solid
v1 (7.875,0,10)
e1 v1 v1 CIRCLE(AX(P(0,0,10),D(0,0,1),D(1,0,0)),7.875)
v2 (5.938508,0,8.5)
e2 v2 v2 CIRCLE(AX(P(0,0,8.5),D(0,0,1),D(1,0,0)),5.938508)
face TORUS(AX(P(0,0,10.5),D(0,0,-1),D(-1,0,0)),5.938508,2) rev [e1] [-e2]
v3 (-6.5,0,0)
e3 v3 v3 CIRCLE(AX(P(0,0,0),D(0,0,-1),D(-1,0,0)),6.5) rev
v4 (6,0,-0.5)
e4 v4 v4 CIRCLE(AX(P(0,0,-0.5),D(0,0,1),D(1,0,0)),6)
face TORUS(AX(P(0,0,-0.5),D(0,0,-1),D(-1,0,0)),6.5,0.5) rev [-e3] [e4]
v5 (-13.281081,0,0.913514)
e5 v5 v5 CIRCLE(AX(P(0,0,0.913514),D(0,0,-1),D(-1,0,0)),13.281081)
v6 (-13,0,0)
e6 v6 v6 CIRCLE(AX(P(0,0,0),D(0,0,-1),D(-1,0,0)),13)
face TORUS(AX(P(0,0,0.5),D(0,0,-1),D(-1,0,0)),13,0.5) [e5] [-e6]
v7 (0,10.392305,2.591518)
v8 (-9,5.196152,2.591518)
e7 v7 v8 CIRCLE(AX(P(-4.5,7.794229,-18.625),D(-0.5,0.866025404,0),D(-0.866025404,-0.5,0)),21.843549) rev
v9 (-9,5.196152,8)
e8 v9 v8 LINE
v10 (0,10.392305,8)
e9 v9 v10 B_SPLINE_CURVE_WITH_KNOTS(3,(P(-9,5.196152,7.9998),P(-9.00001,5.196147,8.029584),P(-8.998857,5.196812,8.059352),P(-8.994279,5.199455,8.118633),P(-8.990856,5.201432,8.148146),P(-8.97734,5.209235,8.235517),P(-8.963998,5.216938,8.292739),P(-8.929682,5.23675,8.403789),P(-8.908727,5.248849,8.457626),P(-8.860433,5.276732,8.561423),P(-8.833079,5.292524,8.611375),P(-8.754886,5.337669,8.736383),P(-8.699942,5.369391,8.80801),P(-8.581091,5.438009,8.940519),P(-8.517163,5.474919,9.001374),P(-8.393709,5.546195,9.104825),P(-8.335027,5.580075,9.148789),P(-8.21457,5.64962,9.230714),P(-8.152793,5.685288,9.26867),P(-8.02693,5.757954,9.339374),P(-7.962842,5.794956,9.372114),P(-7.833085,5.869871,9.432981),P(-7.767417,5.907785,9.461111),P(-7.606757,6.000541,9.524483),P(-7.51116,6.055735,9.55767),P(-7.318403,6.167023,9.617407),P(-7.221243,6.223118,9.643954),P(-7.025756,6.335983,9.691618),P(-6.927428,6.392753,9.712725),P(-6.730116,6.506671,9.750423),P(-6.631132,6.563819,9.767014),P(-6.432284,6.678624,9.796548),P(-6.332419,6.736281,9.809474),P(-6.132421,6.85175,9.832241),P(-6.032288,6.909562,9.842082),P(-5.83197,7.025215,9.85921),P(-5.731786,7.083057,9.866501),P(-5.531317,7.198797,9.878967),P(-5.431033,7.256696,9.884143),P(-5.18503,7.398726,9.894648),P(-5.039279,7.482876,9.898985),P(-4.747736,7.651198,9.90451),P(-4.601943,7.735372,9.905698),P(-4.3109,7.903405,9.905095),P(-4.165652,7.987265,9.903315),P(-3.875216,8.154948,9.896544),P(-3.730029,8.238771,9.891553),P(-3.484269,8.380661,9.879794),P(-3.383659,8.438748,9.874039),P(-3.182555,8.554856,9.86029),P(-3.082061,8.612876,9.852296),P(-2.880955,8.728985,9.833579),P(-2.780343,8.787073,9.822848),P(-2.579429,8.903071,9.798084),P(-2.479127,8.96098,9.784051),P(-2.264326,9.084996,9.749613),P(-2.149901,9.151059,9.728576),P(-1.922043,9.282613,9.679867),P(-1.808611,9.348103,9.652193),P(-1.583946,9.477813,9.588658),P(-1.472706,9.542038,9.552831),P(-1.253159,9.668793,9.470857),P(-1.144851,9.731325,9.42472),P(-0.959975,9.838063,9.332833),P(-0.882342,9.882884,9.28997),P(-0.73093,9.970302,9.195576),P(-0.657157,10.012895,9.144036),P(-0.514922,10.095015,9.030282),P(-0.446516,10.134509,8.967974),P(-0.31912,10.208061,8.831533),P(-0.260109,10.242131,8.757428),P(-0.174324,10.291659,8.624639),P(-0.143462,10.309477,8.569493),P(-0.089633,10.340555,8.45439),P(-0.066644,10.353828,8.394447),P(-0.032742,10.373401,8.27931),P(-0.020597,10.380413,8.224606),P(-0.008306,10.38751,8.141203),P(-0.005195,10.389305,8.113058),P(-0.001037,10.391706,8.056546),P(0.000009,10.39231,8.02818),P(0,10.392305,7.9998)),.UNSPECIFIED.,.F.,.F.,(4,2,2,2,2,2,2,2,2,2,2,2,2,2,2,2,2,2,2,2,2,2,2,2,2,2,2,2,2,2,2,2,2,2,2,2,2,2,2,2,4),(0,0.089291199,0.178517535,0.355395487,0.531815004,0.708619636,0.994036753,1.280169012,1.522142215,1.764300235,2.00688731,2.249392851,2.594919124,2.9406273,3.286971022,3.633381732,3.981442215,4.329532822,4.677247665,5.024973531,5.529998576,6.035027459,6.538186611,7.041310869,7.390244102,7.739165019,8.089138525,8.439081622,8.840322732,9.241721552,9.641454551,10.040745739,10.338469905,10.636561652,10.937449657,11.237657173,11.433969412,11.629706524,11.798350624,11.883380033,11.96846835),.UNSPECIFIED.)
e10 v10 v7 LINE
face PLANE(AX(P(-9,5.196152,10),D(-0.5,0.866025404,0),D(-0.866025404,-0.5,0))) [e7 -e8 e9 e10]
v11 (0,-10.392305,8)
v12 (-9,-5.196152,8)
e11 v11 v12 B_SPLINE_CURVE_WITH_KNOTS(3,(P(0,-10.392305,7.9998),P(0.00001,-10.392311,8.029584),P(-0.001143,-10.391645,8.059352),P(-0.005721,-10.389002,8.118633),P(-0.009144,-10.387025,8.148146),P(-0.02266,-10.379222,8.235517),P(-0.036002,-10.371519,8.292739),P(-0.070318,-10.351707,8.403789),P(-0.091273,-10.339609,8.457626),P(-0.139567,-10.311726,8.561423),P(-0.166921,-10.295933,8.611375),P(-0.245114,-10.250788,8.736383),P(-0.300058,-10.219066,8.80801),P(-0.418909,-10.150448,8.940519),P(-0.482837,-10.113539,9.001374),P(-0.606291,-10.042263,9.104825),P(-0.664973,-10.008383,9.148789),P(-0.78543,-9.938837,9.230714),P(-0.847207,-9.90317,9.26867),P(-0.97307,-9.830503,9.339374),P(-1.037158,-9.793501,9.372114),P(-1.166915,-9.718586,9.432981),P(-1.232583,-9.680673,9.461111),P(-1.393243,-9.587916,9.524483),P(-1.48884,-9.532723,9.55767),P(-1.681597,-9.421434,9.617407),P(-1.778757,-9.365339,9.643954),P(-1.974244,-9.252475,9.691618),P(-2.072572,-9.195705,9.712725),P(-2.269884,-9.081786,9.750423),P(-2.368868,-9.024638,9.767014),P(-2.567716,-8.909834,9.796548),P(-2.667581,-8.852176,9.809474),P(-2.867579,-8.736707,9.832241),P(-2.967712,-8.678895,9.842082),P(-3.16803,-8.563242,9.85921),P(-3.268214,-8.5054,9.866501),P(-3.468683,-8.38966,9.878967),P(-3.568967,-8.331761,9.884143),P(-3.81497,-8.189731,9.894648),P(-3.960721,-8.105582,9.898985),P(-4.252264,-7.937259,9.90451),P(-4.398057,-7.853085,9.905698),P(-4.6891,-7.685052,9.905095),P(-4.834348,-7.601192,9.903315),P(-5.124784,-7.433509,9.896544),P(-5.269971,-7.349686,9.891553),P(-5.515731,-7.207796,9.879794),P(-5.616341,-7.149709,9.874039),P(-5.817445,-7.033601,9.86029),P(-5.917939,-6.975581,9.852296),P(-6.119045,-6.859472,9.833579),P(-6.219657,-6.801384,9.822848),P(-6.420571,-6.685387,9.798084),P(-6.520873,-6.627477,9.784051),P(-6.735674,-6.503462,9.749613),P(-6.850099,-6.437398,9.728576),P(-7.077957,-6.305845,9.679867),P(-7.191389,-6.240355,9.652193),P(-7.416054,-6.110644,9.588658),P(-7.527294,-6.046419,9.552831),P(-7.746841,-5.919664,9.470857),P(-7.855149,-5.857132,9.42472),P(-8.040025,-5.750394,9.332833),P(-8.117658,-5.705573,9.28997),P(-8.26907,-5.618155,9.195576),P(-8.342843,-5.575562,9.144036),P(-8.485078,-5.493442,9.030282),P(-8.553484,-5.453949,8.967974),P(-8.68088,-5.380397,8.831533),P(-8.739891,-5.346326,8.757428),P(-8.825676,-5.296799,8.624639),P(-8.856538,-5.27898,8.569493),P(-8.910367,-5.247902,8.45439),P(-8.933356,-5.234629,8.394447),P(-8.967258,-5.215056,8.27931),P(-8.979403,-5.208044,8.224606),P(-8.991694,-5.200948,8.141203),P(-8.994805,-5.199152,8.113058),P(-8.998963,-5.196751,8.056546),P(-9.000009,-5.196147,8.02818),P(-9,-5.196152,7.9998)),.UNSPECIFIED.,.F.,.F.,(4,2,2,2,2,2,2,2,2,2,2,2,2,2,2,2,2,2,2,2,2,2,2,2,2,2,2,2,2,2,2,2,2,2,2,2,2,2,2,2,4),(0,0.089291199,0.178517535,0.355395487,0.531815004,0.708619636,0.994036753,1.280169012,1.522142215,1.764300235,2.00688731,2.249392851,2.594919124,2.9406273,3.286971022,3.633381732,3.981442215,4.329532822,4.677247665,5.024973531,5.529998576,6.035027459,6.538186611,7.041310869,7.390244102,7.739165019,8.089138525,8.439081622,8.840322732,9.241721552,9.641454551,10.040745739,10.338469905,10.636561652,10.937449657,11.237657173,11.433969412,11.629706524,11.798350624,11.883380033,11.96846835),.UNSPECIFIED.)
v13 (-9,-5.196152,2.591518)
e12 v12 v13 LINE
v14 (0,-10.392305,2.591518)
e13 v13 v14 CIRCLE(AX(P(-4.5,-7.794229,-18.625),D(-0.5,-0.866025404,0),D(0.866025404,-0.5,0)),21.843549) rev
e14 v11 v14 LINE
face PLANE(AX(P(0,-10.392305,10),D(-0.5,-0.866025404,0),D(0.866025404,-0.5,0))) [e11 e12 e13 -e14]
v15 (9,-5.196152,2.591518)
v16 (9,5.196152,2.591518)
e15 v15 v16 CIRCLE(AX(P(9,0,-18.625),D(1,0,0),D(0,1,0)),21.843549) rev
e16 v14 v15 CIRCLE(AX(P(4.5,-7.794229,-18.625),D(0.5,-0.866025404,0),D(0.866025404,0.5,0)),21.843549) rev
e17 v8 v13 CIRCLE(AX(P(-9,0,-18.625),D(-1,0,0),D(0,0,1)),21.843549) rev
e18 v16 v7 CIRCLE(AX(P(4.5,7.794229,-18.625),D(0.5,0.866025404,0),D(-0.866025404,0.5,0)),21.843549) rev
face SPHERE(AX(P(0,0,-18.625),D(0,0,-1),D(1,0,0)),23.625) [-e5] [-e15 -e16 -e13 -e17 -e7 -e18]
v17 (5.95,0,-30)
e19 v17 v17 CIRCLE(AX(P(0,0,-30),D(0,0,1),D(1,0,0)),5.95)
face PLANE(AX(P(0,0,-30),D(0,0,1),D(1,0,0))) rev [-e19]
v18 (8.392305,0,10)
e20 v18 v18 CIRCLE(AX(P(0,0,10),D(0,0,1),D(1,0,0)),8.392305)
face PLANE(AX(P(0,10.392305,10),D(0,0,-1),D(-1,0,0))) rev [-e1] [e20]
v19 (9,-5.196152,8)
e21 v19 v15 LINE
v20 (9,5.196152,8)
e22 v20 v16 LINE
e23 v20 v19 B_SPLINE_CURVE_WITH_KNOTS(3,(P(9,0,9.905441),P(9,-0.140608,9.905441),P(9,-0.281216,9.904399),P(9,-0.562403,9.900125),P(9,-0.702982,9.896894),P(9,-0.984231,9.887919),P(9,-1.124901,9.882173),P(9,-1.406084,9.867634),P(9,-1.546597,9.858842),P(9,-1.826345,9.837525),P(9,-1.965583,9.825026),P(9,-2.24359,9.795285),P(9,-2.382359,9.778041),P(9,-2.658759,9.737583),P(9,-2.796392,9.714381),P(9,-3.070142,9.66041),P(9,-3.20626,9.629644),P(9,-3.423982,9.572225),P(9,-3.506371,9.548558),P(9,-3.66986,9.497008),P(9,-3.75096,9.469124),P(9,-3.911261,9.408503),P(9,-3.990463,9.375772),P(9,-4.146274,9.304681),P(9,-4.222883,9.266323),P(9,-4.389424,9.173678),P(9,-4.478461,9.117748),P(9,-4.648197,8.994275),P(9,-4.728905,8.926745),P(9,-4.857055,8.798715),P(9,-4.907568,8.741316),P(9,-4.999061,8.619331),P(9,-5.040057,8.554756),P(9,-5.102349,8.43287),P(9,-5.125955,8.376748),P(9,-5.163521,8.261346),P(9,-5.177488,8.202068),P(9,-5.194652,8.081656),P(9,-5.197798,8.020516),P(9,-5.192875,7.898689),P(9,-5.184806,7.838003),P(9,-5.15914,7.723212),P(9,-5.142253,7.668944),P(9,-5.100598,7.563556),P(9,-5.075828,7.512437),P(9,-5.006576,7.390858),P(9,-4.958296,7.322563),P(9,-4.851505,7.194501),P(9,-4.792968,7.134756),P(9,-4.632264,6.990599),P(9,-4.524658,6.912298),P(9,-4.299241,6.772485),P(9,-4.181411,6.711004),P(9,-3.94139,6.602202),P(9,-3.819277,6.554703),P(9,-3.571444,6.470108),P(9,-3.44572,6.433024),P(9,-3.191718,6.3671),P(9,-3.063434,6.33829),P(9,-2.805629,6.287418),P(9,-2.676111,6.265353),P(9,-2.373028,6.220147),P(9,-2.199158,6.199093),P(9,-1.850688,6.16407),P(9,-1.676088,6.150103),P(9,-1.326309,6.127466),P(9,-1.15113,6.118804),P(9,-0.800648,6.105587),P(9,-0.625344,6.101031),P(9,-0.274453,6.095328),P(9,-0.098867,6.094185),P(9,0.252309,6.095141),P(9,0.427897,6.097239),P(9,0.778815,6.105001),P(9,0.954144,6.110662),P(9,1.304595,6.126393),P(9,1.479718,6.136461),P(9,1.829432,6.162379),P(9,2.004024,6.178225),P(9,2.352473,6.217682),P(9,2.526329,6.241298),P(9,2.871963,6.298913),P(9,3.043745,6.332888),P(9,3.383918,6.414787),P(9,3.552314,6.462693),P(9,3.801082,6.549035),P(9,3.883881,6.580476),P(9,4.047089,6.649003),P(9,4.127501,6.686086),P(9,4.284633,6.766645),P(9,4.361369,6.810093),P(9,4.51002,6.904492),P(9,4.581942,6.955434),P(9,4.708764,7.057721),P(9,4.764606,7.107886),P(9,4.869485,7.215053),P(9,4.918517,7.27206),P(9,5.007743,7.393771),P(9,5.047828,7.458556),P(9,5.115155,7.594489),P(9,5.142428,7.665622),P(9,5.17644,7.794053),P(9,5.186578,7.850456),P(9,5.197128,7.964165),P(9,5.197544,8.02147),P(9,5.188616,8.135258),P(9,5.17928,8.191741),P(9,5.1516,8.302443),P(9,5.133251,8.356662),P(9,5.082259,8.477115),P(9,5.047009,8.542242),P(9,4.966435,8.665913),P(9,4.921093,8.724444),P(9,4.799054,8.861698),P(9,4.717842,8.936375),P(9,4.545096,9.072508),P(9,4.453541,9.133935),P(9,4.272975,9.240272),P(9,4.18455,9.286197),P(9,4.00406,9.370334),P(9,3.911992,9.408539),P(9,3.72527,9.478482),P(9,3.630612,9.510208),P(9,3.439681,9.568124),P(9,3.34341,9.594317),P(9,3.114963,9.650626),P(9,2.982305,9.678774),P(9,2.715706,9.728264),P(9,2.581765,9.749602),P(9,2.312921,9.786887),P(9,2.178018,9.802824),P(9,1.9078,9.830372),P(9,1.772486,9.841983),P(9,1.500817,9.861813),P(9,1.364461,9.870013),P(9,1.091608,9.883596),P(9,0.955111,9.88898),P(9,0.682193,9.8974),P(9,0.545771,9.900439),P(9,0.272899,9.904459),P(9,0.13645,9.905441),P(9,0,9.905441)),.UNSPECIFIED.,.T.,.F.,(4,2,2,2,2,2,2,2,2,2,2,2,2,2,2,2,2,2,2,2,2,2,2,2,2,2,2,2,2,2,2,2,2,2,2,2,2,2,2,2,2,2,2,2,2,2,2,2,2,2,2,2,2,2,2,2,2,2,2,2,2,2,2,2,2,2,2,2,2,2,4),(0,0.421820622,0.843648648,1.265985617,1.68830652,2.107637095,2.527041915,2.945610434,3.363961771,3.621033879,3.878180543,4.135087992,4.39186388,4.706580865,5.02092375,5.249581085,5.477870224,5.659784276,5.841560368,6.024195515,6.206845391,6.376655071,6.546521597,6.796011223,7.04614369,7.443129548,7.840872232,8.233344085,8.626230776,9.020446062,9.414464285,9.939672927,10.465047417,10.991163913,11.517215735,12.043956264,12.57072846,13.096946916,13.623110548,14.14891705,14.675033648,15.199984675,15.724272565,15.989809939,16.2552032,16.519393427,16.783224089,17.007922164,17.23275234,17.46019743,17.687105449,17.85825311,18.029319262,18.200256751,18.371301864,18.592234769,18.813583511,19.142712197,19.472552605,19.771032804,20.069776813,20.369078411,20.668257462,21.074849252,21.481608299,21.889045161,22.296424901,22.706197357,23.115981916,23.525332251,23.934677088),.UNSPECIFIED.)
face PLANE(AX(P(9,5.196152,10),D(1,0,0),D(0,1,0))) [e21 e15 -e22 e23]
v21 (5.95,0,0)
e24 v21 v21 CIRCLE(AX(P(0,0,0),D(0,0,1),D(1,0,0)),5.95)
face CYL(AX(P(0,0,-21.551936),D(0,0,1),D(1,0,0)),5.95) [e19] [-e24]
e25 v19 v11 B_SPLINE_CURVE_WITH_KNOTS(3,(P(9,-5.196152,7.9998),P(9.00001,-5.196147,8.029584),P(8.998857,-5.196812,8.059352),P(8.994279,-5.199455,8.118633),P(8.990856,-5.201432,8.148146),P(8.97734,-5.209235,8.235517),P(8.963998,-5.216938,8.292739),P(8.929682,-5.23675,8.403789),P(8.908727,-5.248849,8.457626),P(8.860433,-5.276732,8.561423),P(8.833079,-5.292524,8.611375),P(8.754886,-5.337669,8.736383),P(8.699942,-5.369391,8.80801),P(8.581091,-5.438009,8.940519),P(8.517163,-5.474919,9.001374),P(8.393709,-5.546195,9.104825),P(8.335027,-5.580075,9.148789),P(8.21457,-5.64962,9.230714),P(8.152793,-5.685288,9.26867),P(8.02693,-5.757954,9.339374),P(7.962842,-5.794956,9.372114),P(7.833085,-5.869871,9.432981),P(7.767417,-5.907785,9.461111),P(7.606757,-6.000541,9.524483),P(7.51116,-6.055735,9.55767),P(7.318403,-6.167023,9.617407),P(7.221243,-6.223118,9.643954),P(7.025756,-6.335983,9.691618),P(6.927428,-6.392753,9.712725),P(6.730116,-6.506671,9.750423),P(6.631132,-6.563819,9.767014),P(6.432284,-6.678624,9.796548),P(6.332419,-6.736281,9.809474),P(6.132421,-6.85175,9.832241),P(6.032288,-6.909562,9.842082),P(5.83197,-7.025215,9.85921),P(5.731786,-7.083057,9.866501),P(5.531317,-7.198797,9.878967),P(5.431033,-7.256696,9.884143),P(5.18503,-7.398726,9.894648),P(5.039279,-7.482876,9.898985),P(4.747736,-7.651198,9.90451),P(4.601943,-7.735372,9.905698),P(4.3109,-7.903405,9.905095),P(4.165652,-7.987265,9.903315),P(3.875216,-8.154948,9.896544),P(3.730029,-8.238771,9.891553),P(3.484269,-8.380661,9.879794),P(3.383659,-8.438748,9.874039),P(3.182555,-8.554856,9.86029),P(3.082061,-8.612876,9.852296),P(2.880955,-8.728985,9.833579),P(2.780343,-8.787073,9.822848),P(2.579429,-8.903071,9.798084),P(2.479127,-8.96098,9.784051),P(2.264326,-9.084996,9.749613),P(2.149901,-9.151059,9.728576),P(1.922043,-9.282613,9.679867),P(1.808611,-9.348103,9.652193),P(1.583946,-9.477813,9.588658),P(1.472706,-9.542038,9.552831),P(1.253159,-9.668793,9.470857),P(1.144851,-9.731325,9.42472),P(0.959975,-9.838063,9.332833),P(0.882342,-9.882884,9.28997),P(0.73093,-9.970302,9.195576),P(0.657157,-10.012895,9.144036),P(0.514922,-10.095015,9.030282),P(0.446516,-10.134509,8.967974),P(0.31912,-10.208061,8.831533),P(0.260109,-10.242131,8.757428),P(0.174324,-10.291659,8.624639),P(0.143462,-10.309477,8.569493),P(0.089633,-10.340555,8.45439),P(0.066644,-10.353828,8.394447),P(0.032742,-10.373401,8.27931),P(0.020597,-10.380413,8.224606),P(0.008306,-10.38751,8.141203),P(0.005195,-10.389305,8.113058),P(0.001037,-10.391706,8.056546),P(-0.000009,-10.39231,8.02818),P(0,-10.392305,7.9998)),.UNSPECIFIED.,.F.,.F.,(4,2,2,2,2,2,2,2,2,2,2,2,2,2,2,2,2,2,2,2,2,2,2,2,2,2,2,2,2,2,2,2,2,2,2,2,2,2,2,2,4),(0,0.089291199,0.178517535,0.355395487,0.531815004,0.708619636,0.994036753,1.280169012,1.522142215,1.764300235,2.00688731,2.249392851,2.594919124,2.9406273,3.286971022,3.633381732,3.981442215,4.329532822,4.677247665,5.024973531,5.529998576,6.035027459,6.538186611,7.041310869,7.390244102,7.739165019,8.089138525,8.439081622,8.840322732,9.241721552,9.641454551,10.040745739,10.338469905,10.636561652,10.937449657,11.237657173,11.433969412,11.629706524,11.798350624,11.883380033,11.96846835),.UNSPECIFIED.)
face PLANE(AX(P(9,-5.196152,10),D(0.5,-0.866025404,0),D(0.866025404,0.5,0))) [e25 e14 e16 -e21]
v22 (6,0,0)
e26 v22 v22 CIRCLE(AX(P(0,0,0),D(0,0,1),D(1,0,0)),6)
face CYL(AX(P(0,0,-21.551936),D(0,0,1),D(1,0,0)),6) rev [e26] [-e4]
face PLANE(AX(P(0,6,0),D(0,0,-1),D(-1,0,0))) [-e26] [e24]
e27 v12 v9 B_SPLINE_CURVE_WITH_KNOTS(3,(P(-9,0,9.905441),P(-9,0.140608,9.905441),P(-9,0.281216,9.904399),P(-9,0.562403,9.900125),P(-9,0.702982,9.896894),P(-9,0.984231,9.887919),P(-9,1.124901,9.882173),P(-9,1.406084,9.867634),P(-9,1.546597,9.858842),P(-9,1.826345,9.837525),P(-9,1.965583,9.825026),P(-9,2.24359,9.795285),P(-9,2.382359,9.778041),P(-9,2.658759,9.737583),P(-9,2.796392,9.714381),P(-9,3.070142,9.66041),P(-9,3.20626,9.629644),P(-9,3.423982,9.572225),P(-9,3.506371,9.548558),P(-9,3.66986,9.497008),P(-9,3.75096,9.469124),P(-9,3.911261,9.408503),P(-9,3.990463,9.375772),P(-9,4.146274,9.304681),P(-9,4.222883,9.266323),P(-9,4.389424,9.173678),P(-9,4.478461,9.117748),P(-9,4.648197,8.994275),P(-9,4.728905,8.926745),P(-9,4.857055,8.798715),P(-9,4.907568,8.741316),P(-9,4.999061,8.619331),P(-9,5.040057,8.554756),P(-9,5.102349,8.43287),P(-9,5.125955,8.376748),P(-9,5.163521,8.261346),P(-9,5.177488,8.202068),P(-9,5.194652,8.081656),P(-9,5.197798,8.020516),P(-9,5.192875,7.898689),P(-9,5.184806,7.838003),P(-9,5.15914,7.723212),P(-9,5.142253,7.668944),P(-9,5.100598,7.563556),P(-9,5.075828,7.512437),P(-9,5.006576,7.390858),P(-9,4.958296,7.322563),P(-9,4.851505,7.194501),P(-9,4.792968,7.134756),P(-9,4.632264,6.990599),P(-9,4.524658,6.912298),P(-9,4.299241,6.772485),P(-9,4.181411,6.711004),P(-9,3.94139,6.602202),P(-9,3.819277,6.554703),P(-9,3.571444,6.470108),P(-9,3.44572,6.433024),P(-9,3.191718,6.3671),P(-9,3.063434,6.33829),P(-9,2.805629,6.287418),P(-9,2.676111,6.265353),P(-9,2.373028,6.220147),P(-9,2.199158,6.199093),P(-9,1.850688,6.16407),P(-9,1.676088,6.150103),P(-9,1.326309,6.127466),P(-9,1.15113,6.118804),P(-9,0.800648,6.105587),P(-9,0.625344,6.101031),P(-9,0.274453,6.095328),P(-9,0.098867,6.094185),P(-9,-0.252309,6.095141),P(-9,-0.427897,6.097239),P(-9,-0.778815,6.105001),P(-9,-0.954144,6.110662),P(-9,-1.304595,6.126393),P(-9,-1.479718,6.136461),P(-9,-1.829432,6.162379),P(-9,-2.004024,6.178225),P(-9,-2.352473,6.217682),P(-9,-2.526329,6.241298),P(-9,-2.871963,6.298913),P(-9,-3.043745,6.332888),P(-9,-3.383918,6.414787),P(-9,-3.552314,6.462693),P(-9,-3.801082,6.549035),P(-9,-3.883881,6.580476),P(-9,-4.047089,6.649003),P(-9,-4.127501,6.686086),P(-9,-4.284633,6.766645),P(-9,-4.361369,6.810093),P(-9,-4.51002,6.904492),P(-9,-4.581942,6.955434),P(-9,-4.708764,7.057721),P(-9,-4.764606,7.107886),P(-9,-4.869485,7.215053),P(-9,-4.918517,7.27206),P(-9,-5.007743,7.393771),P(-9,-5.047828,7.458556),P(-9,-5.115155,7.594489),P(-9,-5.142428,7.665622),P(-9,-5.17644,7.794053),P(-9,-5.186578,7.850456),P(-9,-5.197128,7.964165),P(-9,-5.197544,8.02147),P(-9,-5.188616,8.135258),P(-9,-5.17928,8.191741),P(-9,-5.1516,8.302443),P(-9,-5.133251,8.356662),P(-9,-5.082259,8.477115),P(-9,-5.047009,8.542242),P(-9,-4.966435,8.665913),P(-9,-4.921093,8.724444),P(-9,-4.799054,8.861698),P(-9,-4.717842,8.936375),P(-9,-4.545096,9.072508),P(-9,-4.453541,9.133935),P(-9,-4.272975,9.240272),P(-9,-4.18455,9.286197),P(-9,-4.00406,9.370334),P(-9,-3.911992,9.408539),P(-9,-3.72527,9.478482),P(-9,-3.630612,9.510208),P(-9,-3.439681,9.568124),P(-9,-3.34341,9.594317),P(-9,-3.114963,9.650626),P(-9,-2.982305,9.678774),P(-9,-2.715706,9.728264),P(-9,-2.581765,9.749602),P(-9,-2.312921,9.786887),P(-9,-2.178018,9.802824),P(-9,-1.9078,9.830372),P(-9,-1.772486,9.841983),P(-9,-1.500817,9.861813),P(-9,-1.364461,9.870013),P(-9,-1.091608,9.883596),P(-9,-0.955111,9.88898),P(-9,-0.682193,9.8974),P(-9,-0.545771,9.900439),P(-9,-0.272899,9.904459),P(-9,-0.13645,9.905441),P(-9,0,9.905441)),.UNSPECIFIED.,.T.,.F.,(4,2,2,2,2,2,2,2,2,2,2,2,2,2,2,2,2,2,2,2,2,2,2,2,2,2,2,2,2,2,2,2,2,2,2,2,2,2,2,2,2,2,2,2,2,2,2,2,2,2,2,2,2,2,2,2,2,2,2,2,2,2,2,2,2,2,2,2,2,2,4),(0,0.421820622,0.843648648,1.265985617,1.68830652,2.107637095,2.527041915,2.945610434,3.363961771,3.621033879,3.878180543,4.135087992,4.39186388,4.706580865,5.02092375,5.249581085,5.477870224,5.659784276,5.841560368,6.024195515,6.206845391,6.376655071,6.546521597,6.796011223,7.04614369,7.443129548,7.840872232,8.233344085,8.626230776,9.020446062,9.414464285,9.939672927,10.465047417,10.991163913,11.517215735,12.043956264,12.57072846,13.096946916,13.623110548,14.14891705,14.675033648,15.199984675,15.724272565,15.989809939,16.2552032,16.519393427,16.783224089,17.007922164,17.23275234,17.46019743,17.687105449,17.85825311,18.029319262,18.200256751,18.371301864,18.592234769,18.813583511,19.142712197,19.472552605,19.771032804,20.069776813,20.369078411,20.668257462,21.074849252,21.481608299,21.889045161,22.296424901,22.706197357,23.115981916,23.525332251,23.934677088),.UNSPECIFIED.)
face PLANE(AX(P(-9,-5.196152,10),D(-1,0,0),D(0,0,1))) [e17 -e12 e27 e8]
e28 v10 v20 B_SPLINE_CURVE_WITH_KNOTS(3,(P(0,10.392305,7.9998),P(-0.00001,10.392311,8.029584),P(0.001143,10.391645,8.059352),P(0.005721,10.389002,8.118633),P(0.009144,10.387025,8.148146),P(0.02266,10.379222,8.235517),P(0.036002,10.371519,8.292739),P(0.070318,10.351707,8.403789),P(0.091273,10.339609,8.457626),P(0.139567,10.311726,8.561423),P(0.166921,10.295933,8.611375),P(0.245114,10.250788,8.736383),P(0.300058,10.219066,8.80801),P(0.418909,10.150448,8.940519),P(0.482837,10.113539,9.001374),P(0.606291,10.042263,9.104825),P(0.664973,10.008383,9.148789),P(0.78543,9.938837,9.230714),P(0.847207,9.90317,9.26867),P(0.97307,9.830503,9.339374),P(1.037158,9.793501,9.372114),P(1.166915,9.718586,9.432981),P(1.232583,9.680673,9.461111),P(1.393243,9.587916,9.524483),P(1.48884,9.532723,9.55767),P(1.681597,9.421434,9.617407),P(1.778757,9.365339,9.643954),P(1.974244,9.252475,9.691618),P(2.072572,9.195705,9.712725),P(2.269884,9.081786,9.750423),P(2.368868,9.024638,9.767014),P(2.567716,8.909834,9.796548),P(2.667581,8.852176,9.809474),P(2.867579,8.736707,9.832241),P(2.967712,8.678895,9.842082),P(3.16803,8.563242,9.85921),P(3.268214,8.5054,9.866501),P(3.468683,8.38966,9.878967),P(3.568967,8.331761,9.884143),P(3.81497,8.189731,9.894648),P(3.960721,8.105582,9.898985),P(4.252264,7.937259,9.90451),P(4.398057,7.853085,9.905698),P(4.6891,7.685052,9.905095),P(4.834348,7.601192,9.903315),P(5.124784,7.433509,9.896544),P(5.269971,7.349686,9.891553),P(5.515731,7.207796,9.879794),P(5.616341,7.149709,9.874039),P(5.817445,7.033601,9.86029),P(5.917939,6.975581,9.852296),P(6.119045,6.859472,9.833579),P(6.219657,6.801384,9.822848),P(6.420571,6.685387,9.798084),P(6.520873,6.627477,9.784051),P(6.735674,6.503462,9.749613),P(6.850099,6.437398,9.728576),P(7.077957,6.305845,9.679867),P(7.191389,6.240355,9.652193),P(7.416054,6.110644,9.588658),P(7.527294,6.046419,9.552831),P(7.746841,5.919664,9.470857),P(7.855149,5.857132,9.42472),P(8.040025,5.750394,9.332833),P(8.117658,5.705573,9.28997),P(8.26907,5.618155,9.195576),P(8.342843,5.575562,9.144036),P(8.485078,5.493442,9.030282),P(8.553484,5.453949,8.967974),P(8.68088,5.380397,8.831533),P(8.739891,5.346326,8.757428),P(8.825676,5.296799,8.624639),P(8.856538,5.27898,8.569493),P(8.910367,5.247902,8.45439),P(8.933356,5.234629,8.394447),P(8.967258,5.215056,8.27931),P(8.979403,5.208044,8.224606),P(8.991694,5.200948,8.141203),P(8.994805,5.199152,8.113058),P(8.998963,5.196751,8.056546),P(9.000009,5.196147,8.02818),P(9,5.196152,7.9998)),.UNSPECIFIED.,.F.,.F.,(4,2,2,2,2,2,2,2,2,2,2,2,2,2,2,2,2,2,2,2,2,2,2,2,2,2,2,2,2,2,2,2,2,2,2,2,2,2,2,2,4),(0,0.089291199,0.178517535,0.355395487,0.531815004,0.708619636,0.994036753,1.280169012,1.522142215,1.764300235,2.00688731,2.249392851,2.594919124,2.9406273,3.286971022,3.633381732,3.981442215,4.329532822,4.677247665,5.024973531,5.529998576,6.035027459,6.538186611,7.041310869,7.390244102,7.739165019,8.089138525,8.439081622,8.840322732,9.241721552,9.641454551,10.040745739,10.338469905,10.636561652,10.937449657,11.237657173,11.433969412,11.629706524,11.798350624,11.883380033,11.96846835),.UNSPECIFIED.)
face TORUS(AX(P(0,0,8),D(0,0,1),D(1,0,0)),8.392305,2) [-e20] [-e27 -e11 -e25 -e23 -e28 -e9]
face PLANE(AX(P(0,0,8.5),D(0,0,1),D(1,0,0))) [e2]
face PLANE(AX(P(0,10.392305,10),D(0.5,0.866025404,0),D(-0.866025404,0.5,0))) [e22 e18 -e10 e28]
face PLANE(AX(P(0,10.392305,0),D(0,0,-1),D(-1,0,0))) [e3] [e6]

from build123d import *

# Parameters (mm, degrees)
HEAD_DEPTH     = 10
SHANK_SKETCH_R = 6
SHANK_DEPTH    = 30
SKETCH6_R      = 7.875
HEAD_CUT_DEPTH = 1.5
FILLET1_R      = 2
FILLET2_R      = 0.5
THREAD_END_W   = 30
THREAD_END_H   = 0.05


with BuildPart() as part:
    # Head Sketch → Head (new body)
    with BuildSketch(Plane.XY):
        Polygon((0, 10.392304845), (9, 5.196152423), (9, -5.196152423), (0, -10.392304845), (-9, -5.196152423), (-9, 5.196152423), align=None)
    extrude(amount=HEAD_DEPTH)

    # Shank Sketch → Shank (add)
    with BuildSketch(Plane.XY):
        Circle(SHANK_SKETCH_R)
    extrude(amount=-SHANK_DEPTH)

    # Sketch3 → Flange (revolve)
    with BuildSketch(Plane(origin=(0, 0, 0), x_dir=(-1, 0, 0), z_dir=(0, 1, 0)), mode=Mode.PRIVATE) as flange_sk:
        with BuildLine():
            Line((-13, 0), (0, 0))
            Line((0, 0), (0, 5))
            ThreePointArc((0, 5), (-6.947778179, 3.955279081), (-13.281081081, 0.913513514))
            ThreePointArc((-13.281081081, 0.913513514), (-13.477889504, 0.352957076), (-13, 0))
        make_face()
    revolve(flange_sk.sketch.rotate(Axis((0, 0, 0), (0, 0, 1)), 30), axis=Axis((0, 0, 0), (0, 0, 1)))

    # Sketch5 → Head Trim (revolve, cut)
    with BuildSketch(Plane(origin=(0, 0, 0), x_dir=(0, 0, -1), z_dir=(1, 0, 0)), mode=Mode.PRIVATE) as head_trim_sk:
        with BuildLine():
            Line((-10, -8.392304845), (-10, -10.392304845))
            Line((-10, -10.392304845), (-8, -10.392304845))
            ThreePointArc((-8, -10.392304845), (-9.414213562, -9.806518408), (-10, -8.392304845))
        make_face()
    revolve(head_trim_sk.sketch.rotate(Axis((0, 0, 15.085599173), (0, 0, -1)), 90), axis=Axis((0, 0, 15.085599173), (0, 0, -1)), mode=Mode.SUBTRACT)

    # Sketch6 → Head Cut (cut)
    with BuildSketch(Plane.XY.offset(10)):
        Circle(SKETCH6_R)
    extrude(amount=-HEAD_CUT_DEPTH, mode=Mode.SUBTRACT)

    # Fillet1
    # the kernel refuses this fillet: 2 mm, written as the material it adds along each edge
    with BuildSketch(Plane(origin=(0, 0, 8.5), x_dir=(1, 0, 0), z_dir=(0, -1, 0))) as fillet1_piece_1:
        with BuildLine():
            CenterArc((5.938508327, 2), FILLET1_R, 270, 75.522487814)
            Line((5.938508327, 0), (5.938508327, -0.04))
            Line((5.938508327, -0.04), (7.875, -0.04))
            Line((7.875, -0.04), (7.915, 0))
            ThreePointArc((7.915, 0), (7.915, 0.75), (7.913729833, 1.49))
            Line((7.913729833, 1.49), (7.875, 1.5))
        make_face()
    revolve(axis=Axis((0, 0, 8.5), (0, 0, 1)))

    # Fillet2
    fillet2_edges = [part.edges().sort_by_distance(p)[0] for p in [
        (-6, 0, 0),
    ]]
    fillet(fillet2_edges, radius=FILLET2_R)

    # Thread End → Thread Cut (revolve, cut)
    with BuildSketch(Plane(origin=(0, 0, 0), x_dir=(0, 0, -1), z_dir=(1, 0, 0)), mode=Mode.PRIVATE) as thread_cut_sk:
        with Locations((15, 5.975)):
            Rectangle(THREAD_END_W, THREAD_END_H)
    revolve(thread_cut_sk.sketch.rotate(Axis((0, 0, -21.551935625), (0, 0, -1)), 90), axis=Axis((0, 0, -21.551935625), (0, 0, -1)), mode=Mode.SUBTRACT)


solid = part.part
